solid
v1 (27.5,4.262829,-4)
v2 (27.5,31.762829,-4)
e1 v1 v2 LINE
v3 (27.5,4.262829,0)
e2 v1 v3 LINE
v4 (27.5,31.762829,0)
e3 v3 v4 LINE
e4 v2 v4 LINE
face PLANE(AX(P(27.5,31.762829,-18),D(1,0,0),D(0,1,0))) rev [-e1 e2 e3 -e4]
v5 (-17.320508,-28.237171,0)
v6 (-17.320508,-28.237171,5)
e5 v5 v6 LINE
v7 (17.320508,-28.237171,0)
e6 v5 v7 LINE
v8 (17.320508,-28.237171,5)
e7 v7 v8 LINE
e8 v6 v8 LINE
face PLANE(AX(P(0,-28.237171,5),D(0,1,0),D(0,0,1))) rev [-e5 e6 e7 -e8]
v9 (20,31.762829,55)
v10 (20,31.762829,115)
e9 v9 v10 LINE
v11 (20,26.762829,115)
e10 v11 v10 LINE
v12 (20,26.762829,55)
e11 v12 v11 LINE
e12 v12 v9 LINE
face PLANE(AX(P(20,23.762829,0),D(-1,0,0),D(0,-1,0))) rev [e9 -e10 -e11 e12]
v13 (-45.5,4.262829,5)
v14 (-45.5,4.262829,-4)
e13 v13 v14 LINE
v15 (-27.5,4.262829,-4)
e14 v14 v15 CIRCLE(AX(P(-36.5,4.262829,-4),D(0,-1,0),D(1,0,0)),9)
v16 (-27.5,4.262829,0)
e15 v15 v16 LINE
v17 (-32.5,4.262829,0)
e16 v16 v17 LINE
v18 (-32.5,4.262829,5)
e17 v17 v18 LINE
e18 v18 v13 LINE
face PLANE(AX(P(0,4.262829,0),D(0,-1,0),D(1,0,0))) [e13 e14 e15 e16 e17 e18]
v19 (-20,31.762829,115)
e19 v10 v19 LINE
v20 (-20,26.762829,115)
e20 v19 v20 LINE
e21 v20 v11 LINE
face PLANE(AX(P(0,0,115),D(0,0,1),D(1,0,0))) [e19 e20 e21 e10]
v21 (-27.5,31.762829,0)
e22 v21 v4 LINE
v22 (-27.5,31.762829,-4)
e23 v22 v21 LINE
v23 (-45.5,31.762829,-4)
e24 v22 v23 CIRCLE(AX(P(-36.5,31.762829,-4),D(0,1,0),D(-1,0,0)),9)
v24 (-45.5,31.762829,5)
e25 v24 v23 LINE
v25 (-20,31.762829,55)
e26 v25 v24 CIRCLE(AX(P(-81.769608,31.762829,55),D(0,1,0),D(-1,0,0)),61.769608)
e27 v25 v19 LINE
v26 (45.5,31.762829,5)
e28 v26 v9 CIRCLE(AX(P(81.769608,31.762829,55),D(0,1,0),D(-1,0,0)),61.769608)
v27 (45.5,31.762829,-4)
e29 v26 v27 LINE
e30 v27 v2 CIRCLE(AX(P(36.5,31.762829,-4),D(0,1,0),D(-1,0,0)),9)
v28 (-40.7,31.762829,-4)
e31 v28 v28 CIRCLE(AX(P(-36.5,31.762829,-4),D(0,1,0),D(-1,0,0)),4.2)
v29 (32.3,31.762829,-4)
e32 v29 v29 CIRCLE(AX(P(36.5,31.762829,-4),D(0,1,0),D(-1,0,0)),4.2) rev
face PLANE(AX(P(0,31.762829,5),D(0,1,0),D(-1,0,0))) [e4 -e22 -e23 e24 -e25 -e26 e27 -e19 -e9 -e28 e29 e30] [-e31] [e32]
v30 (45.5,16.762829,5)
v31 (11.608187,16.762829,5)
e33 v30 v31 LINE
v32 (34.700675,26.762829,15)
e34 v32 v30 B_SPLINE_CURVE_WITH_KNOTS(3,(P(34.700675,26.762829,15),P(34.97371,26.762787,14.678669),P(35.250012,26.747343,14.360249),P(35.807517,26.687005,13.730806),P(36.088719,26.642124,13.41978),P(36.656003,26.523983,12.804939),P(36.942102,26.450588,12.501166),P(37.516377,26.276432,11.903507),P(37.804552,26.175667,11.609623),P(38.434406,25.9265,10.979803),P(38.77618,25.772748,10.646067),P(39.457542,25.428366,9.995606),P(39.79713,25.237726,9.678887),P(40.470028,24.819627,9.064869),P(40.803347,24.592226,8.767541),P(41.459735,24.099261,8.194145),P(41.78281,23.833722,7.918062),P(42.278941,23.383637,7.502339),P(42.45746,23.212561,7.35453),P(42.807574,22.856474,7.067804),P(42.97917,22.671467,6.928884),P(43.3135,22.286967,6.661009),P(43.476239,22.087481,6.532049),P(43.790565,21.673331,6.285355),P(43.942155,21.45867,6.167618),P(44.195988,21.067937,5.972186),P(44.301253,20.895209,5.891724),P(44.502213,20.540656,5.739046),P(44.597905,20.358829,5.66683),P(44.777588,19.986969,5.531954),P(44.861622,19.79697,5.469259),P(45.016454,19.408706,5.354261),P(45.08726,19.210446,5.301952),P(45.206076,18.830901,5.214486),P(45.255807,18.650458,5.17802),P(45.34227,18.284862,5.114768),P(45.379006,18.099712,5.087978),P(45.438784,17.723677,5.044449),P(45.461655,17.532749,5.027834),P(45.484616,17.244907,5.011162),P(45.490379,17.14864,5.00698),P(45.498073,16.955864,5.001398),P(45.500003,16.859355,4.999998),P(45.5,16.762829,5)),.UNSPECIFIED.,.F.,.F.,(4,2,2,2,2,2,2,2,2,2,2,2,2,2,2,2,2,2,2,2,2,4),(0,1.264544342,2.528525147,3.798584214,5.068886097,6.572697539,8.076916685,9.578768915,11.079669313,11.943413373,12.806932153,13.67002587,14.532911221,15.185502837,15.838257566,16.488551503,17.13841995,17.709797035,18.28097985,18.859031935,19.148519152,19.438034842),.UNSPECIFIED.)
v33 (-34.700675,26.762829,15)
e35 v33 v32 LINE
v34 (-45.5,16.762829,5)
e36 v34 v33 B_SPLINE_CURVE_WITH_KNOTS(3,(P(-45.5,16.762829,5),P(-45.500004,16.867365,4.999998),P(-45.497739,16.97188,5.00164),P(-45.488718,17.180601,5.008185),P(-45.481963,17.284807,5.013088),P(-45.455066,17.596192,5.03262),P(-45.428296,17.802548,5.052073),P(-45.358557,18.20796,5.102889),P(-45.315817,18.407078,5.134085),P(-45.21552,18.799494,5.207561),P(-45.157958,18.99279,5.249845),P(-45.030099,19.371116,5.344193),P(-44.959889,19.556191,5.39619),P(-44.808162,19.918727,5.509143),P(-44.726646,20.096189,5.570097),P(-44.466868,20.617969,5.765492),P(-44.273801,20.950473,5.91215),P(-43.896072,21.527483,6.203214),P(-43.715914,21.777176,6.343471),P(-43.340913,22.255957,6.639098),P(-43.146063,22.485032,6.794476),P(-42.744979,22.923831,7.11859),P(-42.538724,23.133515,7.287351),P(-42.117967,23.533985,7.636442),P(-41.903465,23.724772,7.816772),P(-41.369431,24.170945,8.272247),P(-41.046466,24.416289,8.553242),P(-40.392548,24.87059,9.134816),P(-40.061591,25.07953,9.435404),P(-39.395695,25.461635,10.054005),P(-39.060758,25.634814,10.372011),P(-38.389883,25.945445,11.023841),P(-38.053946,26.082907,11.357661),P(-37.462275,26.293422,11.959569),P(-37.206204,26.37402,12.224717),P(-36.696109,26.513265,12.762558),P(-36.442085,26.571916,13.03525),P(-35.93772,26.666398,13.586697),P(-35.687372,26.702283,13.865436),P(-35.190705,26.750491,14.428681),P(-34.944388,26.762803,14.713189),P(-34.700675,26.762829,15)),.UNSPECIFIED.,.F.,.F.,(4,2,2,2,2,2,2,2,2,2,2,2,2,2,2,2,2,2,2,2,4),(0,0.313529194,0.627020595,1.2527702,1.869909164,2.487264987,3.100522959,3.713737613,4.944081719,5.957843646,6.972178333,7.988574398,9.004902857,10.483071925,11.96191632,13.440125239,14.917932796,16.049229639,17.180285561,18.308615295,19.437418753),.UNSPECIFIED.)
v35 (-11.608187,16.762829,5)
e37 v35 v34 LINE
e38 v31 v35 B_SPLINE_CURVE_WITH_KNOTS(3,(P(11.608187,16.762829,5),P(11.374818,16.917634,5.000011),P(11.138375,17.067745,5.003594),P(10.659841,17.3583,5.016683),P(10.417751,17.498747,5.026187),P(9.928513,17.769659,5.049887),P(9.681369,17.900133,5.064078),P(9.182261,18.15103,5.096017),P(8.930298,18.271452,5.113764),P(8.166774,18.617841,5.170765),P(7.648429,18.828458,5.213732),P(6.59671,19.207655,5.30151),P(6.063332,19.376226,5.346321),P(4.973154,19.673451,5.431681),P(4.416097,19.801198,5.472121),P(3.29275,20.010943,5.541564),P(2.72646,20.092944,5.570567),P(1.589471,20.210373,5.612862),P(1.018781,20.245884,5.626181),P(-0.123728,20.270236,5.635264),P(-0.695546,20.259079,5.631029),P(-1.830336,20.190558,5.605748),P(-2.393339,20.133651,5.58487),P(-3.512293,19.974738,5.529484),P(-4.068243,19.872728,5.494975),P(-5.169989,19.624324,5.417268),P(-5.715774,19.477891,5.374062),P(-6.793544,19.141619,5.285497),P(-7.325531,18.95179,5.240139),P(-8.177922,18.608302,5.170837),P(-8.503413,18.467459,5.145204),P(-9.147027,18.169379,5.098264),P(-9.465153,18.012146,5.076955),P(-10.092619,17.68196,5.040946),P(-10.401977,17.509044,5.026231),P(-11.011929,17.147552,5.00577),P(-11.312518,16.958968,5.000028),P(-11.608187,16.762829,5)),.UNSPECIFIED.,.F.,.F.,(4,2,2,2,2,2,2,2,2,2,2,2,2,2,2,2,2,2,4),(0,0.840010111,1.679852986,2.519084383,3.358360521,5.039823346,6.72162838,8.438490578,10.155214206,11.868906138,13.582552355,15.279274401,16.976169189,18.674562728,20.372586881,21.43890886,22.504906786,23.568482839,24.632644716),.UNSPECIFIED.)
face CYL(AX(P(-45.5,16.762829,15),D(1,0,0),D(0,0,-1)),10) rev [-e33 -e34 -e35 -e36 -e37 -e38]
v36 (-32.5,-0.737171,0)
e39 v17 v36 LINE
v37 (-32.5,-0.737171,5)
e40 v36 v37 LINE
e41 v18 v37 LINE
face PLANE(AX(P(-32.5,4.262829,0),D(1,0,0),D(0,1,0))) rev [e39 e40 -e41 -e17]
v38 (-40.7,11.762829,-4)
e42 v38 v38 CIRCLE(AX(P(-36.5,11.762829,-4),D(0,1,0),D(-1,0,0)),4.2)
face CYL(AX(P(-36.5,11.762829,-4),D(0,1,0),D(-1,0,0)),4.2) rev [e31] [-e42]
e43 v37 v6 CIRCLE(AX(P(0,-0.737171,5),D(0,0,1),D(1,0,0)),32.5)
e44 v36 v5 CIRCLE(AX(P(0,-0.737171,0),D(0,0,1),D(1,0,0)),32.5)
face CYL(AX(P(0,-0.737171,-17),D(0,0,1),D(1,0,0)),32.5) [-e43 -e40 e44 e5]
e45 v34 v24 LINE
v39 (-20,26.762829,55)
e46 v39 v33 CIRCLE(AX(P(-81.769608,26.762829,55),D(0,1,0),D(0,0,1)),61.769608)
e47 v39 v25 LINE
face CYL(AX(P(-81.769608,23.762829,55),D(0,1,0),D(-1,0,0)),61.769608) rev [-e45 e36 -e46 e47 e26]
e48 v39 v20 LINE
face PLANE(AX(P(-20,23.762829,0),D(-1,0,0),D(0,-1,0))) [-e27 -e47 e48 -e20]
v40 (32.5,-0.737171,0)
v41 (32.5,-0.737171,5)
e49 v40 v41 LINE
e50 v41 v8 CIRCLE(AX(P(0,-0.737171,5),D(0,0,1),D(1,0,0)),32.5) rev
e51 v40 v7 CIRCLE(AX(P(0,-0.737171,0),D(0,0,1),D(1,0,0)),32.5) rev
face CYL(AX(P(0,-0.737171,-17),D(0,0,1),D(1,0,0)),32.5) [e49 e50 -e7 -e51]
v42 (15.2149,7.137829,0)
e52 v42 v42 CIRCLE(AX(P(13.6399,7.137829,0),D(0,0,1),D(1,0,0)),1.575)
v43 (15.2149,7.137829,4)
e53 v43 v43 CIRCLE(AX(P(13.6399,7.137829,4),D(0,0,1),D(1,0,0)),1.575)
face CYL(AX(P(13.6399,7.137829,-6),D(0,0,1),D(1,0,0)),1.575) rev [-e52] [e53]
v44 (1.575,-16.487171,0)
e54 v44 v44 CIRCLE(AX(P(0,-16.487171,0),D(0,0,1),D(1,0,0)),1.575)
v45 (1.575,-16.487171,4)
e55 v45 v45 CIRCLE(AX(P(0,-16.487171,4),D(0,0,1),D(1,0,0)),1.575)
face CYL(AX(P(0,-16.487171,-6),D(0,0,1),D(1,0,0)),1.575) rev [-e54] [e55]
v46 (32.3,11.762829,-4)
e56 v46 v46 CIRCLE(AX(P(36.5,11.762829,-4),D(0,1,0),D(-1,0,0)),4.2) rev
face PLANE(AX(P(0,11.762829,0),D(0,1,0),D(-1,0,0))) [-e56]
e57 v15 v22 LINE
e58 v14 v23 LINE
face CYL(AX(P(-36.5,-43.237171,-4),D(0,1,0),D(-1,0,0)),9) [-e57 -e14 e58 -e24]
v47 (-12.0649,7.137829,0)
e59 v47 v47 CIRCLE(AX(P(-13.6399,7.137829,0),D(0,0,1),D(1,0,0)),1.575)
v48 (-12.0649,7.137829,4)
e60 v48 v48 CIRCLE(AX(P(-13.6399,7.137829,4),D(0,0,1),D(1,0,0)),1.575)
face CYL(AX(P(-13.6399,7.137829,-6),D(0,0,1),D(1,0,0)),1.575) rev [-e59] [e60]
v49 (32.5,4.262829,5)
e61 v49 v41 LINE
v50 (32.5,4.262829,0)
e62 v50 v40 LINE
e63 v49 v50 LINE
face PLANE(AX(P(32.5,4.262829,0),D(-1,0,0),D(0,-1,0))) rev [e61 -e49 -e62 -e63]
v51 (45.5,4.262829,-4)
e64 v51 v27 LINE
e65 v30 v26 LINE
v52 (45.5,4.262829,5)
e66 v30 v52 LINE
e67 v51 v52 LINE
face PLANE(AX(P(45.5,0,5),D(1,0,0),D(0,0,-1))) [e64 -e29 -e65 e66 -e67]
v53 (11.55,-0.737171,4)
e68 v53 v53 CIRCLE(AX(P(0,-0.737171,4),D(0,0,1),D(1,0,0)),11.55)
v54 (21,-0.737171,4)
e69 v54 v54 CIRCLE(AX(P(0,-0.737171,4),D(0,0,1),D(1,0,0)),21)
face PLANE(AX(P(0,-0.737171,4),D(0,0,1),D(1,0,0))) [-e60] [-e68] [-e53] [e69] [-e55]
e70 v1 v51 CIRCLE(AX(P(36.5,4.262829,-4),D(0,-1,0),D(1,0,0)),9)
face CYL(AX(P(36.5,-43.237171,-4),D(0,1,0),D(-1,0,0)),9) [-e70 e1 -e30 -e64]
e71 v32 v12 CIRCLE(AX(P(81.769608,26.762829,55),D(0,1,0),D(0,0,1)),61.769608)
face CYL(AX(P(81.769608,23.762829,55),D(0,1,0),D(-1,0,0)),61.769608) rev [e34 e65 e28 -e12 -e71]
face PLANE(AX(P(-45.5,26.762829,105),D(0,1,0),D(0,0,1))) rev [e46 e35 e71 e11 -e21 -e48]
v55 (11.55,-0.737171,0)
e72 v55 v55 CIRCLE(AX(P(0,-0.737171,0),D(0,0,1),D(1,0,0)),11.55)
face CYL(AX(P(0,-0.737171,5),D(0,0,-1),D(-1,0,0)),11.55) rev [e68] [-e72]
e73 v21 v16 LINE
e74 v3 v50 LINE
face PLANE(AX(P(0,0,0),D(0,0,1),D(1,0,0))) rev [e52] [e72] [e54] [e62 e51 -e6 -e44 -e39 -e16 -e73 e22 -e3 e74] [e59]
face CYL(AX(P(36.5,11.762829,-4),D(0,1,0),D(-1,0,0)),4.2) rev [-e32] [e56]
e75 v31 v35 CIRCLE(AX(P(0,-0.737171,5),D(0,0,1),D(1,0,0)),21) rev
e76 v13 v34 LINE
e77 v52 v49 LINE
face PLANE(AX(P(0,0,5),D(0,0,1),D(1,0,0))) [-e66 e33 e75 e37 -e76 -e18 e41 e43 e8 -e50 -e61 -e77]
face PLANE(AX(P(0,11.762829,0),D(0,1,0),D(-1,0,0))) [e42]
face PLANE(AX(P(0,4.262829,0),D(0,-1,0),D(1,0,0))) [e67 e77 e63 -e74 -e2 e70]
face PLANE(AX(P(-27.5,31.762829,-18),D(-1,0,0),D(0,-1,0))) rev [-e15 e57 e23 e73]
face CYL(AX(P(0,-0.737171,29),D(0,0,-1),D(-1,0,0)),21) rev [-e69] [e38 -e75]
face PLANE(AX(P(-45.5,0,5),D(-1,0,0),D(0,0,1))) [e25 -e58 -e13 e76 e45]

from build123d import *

# Parameters (mm, degrees)
SKETCH1_W                = 9
SKETCH1_H                = 55
SKETCH1_W_2              = 91
SKETCH1_H_2              = 5
BOSS_EXTRUDE3_DEPTH      = 5
SKETCH6_W                = 18
SKETCH6_H                = 60
BOSS_EXTRUDE4_DEPTH      = 18
SKETCH7_W                = 91
SKETCH7_H                = 5
BOSS_EXTRUDE5_DEPTH      = 100
SKETCH13_W               = 18
SKETCH13_H               = 5
CUT_EXTRUDE6_DEPTH       = 75
SKETCH16_R               = 4.2
CUT_EXTRUDE7_DEPTH       = 20
CUT_EXTRUDE8_DEPTH       = 75
CUT_EXTRUDE10_DEPTH      = 8
CUT_EXTRUDE11_DEPTH      = 22
CUT_EXTRUDE14_DEPTH      = 34
CUT_EXTRUDE14_DEPTH_BACK = 5
FILLET4_R                = 10
CUT_EXTRUDE15_DEPTH      = 24
CUT_EXTRUDE15_DEPTH_BACK = 1
SKETCH23_R               = 21
SKETCH26_R               = 1.575
CUT_EXTRUDE16_DEPTH      = 10
SKETCH27_W               = 40
SKETCH27_H               = 5
BOSS_EXTRUDE6_DEPTH      = 10


with BuildPart() as part:
    # Sketch1 → Boss-Extrude3 (new body)
    with BuildSketch(Plane.XY):
        with Locations((41, -0.737170899)):
            Rectangle(SKETCH1_W, SKETCH1_H)
        with Locations((32, -0.737170899)):
            Rectangle(SKETCH1_W, SKETCH1_H)
        with BuildLine():
            Line((27.5, 26.762829101), (0, 26.762829101))
            Line((0, 26.762829101), (0, 10.812829101))
            ThreePointArc((0, 10.812829101), (8.167083323, 7.429912424), (11.55, -0.737170899))
            ThreePointArc((11.55, -0.737170899), (8.167083323, -8.904254222), (0, -12.287170899))
            Line((0, -12.287170899), (0, -28.237170899))
            Line((0, -28.237170899), (27.5, -28.237170899))
            Line((27.5, -28.237170899), (27.5, 26.762829101))
        make_face()
        with BuildLine():
            Line((0, 10.812829101), (0, 26.762829101))
            Line((0, 26.762829101), (-27.5, 26.762829101))
            Line((-27.5, 26.762829101), (-27.5, -28.237170899))
            Line((-27.5, -28.237170899), (0, -28.237170899))
            Line((0, -28.237170899), (0, -12.287170899))
            ThreePointArc((0, -12.287170899), (-11.55, -0.737170899), (0, 10.812829101))
        make_face()
        with Locations((-32, -0.737170899)):
            Rectangle(SKETCH1_W, SKETCH1_H)
        with Locations((-41, -0.737170899)):
            Rectangle(SKETCH1_W, SKETCH1_H)
        with Locations((0, 29.262829101)):
            Rectangle(SKETCH1_W_2, SKETCH1_H_2)
    extrude(amount=BOSS_EXTRUDE3_DEPTH)

    # Sketch6 → Boss-Extrude4 (add)
    with BuildSketch(Plane(origin=(0, 0, 0), x_dir=(-1, 0, 0), z_dir=(0, 0, -1))):
        with Locations((-36.5, 1.762829101)):
            Rectangle(SKETCH6_W, SKETCH6_H)
        with Locations((36.5, 1.762829101)):
            Rectangle(SKETCH6_W, SKETCH6_H)
    extrude(amount=BOSS_EXTRUDE4_DEPTH)

    # Sketch7 → Boss-Extrude5 (add)
    with BuildSketch(Plane.XY.offset(5)):
        with Locations((0, 29.262829101)):
            Rectangle(SKETCH7_W, SKETCH7_H)
    extrude(amount=BOSS_EXTRUDE5_DEPTH)

    # Sketch13 → Cut-Extrude6 (cut)
    with BuildSketch(Plane(origin=(0, 31.762829101, 0), x_dir=(1, 0, 0), z_dir=(0, 1, 0))):
        with Locations((-36.5, 15.5)):
            Rectangle(SKETCH13_W, SKETCH13_H)
        with Locations((36.5, 15.5)):
            Rectangle(SKETCH13_W, SKETCH13_H)
    extrude(amount=-CUT_EXTRUDE6_DEPTH, mode=Mode.SUBTRACT)

    # Sketch16 → Cut-Extrude7 (cut)
    with BuildSketch(Plane(origin=(0, 31.762829101, 0), x_dir=(1, 0, 0), z_dir=(0, 1, 0))):
        with Locations(Location((-36.5, 4, 0), (0, 0, 180))):
            Circle(SKETCH16_R)
        with Locations(Location((36.5, 4, 0), (0, 0, 180))):
            Circle(SKETCH16_R)
    extrude(amount=-CUT_EXTRUDE7_DEPTH, mode=Mode.SUBTRACT)

    # Sketch17 → Cut-Extrude8 (cut)
    with BuildSketch(Plane(origin=(0, 31.762829101, 0), x_dir=(1, 0, 0), z_dir=(0, 1, 0))):
        with BuildLine():
            Line((-45.5, 13), (-45.5, 4))
            ThreePointArc((-45.5, 4), (-42.863961031, 10.363961031), (-36.5, 13))
            Line((-36.5, 13), (-45.5, 13))
        make_face()
        with BuildLine():
            ThreePointArc((-36.5, 13), (-30.136038969, 10.363961031), (-27.5, 4))
            Line((-27.5, 4), (-27.5, 13))
            Line((-27.5, 13), (-36.5, 13))
        make_face()
        with BuildLine():
            Line((27.5, 13), (27.5, 4))
            ThreePointArc((27.5, 4), (30.136038969, 10.363961031), (36.5, 13))
            Line((36.5, 13), (27.5, 13))
        make_face()
        with BuildLine():
            Line((45.5, 13), (36.5, 13))
            ThreePointArc((36.5, 13), (42.863961031, 10.363961031), (45.5, 4))
            Line((45.5, 4), (45.5, 13))
        make_face()
    extrude(amount=-CUT_EXTRUDE8_DEPTH, mode=Mode.SUBTRACT)

    # Sketch18 → Cut-Extrude10 (cut)
    with BuildSketch(Plane(origin=(0, 31.762829101, 0), x_dir=(1, 0, 0), z_dir=(0, 1, 0))):
        with BuildLine():
            ThreePointArc((-45.5, -105), (-26.743051045, -83.063543967), (-20, -55))
            Line((-20, -55), (-45.5, -55))
            Line((-45.5, -55), (-45.5, -105))
        make_face()
        with BuildLine():
            Line((-45.5, -55), (-20, -55))
            ThreePointArc((-20, -55), (-26.743051045, -26.936456033), (-45.5, -5))
            Line((-45.5, -5), (-45.5, -55))
        make_face()
        with BuildLine():
            ThreePointArc((-45.5, -105), (-26.743051045, -83.063543967), (-20, -55))
            Line((-20, -55), (-45.5, -55))
            Line((-45.5, -55), (-45.5, -105))
        make_face()
        with BuildLine():
            Line((-45.5, -55), (-20, -55))
            ThreePointArc((-20, -55), (-26.743051045, -26.936456033), (-45.5, -5))
            Line((-45.5, -5), (-45.5, -55))
        make_face()
        with BuildLine():
            Line((-20, -105), (-20, -55))
            ThreePointArc((-20, -55), (-26.743051045, -83.063543967), (-45.5, -105))
            Line((-45.5, -105), (-20, -105))
        make_face()
        with BuildLine():
            Line((20, -55), (20, -105))
            Line((20, -105), (45.5, -105))
            ThreePointArc((45.5, -105), (26.743051045, -83.063543967), (20, -55))
        make_face()
        with BuildLine():
            Line((45.5, -55), (45.5, -5))
            ThreePointArc((45.5, -5), (26.743051045, -26.936456033), (20, -55))
            Line((20, -55), (45.5, -55))
        make_face()
        with BuildLine():
            ThreePointArc((20, -55), (26.743051045, -83.063543967), (45.5, -105))
            Line((45.5, -105), (45.5, -55))
            Line((45.5, -55), (20, -55))
        make_face()
        with BuildLine():
            Line((45.5, -55), (45.5, -5))
            ThreePointArc((45.5, -5), (26.743051045, -26.936456033), (20, -55))
            Line((20, -55), (45.5, -55))
        make_face()
        with BuildLine():
            ThreePointArc((20, -55), (26.743051045, -83.063543967), (45.5, -105))
            Line((45.5, -105), (45.5, -55))
            Line((45.5, -55), (20, -55))
        make_face()
    extrude(amount=-CUT_EXTRUDE10_DEPTH, mode=Mode.SUBTRACT)

    # Sketch19 → Cut-Extrude11 (cut)
    with BuildSketch(Plane.XY.offset(5)):
        with BuildLine():
            Line((-32.5, -0.737170899), (-45.5, -0.737170899))
            Line((-45.5, -0.737170899), (-45.5, -28.237170899))
            Line((-45.5, -28.237170899), (-17.320508076, -28.237170899))
            ThreePointArc((-17.320508076, -28.237170899), (-28.453176558, -16.442798673), (-32.5, -0.737170899))
        make_face()
        with BuildLine():
            Line((45.5, -28.237170899), (17.320508076, -28.237170899))
            ThreePointArc((17.320508076, -28.237170899), (28.453176558, -16.442798673), (32.5, -0.737170899))
            Line((32.5, -0.737170899), (45.5, -0.737170899))
            Line((45.5, -0.737170899), (45.5, -28.237170899))
        make_face()
    extrude(amount=-CUT_EXTRUDE11_DEPTH, mode=Mode.SUBTRACT)

    # Sketch21 → Cut-Extrude14 (cut, two sides: drawn at the far end of the back side and taken through both)
    with BuildSketch(Plane.XZ.offset(0.737170899).offset(-CUT_EXTRUDE14_DEPTH_BACK)):
        with BuildLine():
            Line((27.5, 0), (32.5, 0))
            Line((32.5, 0), (32.5, 5))
            Line((32.5, 5), (45.5, 5))
            Line((45.5, 5), (45.5, -4))
            ThreePointArc((45.5, -4), (36.5, -13), (27.5, -4))
            Line((27.5, -4), (27.5, 0))
        make_face()
        with BuildLine():
            Line((-27.5, -4), (-27.5, 0))
            Line((-27.5, 0), (-32.5, 0))
            Line((-32.5, 0), (-32.5, 5))
            Line((-32.5, 5), (-45.5, 5))
            Line((-45.5, 5), (-45.5, -4))
            ThreePointArc((-45.5, -4), (-36.5, -13), (-27.5, -4))
        make_face()
    extrude(amount=CUT_EXTRUDE14_DEPTH + CUT_EXTRUDE14_DEPTH_BACK, mode=Mode.SUBTRACT)

    # Fillet4
    # the kernel refuses this fillet: 10 mm, written as the material it adds along each edge
    with BuildSketch(Plane(origin=(70.5, 26.762829101, 5), x_dir=(0, -1, 0), z_dir=(-1, 0, 0))) as fillet4_piece_1_section:
        with BuildLine():
            CenterArc((FILLET4_R, FILLET4_R), FILLET4_R, 180, 90)
            Line((0, FILLET4_R), (0, 0))
            Line((0, 0), (FILLET4_R, 0))
        make_face()
    fillet4_piece_1 = extrude(amount=141, mode=Mode.PRIVATE)
    fillet4_piece_1 = fillet4_piece_1 - Plane(origin=(-81.769607843, 24.471447362, 55), x_dir=(0.5871756209824568, 0, 0.8094595667010591), z_dir=(0, 1, 0)) * Cylinder(61.769607843, 322, mode=Mode.PRIVATE)
    fillet4_piece_1 = fillet4_piece_1 - Plane(origin=(81.769607843, 24.471447362, 55), x_dir=(-0.5871756209824566, 0, -0.8094595667010592), z_dir=(0, 1, 0)) * Cylinder(61.769607843, 322, mode=Mode.PRIVATE)
    add(fillet4_piece_1)

    # Sketch23 → Cut-Extrude15 (cut, two sides: drawn at the far end of the back side and taken through both)
    with BuildSketch(Plane.XY.offset(5).offset(-CUT_EXTRUDE15_DEPTH_BACK)):
        with Locations(Location((0, -0.737170899, 0), (0, 0, 123.557309762))):
            Circle(SKETCH23_R)
    extrude(amount=CUT_EXTRUDE15_DEPTH + CUT_EXTRUDE15_DEPTH_BACK, mode=Mode.SUBTRACT)

    # Sketch26 → Cut-Extrude16 (cut)
    with BuildSketch(Plane.XY.offset(4)):
        with Locations((0, -16.487170899)):
            Circle(SKETCH26_R)
        with Locations((-13.63990011, 7.137829101)):
            Circle(SKETCH26_R)
        with Locations((13.63990011, 7.137829101)):
            Circle(SKETCH26_R)
    extrude(amount=-CUT_EXTRUDE16_DEPTH, mode=Mode.SUBTRACT)

    # Sketch27 → Boss-Extrude6 (add)
    with BuildSketch(Plane.XY.offset(105)):
        with Locations((0, 29.262829101)):
            Rectangle(SKETCH27_W, SKETCH27_H)
    extrude(amount=BOSS_EXTRUDE6_DEPTH)


solid = part.part
